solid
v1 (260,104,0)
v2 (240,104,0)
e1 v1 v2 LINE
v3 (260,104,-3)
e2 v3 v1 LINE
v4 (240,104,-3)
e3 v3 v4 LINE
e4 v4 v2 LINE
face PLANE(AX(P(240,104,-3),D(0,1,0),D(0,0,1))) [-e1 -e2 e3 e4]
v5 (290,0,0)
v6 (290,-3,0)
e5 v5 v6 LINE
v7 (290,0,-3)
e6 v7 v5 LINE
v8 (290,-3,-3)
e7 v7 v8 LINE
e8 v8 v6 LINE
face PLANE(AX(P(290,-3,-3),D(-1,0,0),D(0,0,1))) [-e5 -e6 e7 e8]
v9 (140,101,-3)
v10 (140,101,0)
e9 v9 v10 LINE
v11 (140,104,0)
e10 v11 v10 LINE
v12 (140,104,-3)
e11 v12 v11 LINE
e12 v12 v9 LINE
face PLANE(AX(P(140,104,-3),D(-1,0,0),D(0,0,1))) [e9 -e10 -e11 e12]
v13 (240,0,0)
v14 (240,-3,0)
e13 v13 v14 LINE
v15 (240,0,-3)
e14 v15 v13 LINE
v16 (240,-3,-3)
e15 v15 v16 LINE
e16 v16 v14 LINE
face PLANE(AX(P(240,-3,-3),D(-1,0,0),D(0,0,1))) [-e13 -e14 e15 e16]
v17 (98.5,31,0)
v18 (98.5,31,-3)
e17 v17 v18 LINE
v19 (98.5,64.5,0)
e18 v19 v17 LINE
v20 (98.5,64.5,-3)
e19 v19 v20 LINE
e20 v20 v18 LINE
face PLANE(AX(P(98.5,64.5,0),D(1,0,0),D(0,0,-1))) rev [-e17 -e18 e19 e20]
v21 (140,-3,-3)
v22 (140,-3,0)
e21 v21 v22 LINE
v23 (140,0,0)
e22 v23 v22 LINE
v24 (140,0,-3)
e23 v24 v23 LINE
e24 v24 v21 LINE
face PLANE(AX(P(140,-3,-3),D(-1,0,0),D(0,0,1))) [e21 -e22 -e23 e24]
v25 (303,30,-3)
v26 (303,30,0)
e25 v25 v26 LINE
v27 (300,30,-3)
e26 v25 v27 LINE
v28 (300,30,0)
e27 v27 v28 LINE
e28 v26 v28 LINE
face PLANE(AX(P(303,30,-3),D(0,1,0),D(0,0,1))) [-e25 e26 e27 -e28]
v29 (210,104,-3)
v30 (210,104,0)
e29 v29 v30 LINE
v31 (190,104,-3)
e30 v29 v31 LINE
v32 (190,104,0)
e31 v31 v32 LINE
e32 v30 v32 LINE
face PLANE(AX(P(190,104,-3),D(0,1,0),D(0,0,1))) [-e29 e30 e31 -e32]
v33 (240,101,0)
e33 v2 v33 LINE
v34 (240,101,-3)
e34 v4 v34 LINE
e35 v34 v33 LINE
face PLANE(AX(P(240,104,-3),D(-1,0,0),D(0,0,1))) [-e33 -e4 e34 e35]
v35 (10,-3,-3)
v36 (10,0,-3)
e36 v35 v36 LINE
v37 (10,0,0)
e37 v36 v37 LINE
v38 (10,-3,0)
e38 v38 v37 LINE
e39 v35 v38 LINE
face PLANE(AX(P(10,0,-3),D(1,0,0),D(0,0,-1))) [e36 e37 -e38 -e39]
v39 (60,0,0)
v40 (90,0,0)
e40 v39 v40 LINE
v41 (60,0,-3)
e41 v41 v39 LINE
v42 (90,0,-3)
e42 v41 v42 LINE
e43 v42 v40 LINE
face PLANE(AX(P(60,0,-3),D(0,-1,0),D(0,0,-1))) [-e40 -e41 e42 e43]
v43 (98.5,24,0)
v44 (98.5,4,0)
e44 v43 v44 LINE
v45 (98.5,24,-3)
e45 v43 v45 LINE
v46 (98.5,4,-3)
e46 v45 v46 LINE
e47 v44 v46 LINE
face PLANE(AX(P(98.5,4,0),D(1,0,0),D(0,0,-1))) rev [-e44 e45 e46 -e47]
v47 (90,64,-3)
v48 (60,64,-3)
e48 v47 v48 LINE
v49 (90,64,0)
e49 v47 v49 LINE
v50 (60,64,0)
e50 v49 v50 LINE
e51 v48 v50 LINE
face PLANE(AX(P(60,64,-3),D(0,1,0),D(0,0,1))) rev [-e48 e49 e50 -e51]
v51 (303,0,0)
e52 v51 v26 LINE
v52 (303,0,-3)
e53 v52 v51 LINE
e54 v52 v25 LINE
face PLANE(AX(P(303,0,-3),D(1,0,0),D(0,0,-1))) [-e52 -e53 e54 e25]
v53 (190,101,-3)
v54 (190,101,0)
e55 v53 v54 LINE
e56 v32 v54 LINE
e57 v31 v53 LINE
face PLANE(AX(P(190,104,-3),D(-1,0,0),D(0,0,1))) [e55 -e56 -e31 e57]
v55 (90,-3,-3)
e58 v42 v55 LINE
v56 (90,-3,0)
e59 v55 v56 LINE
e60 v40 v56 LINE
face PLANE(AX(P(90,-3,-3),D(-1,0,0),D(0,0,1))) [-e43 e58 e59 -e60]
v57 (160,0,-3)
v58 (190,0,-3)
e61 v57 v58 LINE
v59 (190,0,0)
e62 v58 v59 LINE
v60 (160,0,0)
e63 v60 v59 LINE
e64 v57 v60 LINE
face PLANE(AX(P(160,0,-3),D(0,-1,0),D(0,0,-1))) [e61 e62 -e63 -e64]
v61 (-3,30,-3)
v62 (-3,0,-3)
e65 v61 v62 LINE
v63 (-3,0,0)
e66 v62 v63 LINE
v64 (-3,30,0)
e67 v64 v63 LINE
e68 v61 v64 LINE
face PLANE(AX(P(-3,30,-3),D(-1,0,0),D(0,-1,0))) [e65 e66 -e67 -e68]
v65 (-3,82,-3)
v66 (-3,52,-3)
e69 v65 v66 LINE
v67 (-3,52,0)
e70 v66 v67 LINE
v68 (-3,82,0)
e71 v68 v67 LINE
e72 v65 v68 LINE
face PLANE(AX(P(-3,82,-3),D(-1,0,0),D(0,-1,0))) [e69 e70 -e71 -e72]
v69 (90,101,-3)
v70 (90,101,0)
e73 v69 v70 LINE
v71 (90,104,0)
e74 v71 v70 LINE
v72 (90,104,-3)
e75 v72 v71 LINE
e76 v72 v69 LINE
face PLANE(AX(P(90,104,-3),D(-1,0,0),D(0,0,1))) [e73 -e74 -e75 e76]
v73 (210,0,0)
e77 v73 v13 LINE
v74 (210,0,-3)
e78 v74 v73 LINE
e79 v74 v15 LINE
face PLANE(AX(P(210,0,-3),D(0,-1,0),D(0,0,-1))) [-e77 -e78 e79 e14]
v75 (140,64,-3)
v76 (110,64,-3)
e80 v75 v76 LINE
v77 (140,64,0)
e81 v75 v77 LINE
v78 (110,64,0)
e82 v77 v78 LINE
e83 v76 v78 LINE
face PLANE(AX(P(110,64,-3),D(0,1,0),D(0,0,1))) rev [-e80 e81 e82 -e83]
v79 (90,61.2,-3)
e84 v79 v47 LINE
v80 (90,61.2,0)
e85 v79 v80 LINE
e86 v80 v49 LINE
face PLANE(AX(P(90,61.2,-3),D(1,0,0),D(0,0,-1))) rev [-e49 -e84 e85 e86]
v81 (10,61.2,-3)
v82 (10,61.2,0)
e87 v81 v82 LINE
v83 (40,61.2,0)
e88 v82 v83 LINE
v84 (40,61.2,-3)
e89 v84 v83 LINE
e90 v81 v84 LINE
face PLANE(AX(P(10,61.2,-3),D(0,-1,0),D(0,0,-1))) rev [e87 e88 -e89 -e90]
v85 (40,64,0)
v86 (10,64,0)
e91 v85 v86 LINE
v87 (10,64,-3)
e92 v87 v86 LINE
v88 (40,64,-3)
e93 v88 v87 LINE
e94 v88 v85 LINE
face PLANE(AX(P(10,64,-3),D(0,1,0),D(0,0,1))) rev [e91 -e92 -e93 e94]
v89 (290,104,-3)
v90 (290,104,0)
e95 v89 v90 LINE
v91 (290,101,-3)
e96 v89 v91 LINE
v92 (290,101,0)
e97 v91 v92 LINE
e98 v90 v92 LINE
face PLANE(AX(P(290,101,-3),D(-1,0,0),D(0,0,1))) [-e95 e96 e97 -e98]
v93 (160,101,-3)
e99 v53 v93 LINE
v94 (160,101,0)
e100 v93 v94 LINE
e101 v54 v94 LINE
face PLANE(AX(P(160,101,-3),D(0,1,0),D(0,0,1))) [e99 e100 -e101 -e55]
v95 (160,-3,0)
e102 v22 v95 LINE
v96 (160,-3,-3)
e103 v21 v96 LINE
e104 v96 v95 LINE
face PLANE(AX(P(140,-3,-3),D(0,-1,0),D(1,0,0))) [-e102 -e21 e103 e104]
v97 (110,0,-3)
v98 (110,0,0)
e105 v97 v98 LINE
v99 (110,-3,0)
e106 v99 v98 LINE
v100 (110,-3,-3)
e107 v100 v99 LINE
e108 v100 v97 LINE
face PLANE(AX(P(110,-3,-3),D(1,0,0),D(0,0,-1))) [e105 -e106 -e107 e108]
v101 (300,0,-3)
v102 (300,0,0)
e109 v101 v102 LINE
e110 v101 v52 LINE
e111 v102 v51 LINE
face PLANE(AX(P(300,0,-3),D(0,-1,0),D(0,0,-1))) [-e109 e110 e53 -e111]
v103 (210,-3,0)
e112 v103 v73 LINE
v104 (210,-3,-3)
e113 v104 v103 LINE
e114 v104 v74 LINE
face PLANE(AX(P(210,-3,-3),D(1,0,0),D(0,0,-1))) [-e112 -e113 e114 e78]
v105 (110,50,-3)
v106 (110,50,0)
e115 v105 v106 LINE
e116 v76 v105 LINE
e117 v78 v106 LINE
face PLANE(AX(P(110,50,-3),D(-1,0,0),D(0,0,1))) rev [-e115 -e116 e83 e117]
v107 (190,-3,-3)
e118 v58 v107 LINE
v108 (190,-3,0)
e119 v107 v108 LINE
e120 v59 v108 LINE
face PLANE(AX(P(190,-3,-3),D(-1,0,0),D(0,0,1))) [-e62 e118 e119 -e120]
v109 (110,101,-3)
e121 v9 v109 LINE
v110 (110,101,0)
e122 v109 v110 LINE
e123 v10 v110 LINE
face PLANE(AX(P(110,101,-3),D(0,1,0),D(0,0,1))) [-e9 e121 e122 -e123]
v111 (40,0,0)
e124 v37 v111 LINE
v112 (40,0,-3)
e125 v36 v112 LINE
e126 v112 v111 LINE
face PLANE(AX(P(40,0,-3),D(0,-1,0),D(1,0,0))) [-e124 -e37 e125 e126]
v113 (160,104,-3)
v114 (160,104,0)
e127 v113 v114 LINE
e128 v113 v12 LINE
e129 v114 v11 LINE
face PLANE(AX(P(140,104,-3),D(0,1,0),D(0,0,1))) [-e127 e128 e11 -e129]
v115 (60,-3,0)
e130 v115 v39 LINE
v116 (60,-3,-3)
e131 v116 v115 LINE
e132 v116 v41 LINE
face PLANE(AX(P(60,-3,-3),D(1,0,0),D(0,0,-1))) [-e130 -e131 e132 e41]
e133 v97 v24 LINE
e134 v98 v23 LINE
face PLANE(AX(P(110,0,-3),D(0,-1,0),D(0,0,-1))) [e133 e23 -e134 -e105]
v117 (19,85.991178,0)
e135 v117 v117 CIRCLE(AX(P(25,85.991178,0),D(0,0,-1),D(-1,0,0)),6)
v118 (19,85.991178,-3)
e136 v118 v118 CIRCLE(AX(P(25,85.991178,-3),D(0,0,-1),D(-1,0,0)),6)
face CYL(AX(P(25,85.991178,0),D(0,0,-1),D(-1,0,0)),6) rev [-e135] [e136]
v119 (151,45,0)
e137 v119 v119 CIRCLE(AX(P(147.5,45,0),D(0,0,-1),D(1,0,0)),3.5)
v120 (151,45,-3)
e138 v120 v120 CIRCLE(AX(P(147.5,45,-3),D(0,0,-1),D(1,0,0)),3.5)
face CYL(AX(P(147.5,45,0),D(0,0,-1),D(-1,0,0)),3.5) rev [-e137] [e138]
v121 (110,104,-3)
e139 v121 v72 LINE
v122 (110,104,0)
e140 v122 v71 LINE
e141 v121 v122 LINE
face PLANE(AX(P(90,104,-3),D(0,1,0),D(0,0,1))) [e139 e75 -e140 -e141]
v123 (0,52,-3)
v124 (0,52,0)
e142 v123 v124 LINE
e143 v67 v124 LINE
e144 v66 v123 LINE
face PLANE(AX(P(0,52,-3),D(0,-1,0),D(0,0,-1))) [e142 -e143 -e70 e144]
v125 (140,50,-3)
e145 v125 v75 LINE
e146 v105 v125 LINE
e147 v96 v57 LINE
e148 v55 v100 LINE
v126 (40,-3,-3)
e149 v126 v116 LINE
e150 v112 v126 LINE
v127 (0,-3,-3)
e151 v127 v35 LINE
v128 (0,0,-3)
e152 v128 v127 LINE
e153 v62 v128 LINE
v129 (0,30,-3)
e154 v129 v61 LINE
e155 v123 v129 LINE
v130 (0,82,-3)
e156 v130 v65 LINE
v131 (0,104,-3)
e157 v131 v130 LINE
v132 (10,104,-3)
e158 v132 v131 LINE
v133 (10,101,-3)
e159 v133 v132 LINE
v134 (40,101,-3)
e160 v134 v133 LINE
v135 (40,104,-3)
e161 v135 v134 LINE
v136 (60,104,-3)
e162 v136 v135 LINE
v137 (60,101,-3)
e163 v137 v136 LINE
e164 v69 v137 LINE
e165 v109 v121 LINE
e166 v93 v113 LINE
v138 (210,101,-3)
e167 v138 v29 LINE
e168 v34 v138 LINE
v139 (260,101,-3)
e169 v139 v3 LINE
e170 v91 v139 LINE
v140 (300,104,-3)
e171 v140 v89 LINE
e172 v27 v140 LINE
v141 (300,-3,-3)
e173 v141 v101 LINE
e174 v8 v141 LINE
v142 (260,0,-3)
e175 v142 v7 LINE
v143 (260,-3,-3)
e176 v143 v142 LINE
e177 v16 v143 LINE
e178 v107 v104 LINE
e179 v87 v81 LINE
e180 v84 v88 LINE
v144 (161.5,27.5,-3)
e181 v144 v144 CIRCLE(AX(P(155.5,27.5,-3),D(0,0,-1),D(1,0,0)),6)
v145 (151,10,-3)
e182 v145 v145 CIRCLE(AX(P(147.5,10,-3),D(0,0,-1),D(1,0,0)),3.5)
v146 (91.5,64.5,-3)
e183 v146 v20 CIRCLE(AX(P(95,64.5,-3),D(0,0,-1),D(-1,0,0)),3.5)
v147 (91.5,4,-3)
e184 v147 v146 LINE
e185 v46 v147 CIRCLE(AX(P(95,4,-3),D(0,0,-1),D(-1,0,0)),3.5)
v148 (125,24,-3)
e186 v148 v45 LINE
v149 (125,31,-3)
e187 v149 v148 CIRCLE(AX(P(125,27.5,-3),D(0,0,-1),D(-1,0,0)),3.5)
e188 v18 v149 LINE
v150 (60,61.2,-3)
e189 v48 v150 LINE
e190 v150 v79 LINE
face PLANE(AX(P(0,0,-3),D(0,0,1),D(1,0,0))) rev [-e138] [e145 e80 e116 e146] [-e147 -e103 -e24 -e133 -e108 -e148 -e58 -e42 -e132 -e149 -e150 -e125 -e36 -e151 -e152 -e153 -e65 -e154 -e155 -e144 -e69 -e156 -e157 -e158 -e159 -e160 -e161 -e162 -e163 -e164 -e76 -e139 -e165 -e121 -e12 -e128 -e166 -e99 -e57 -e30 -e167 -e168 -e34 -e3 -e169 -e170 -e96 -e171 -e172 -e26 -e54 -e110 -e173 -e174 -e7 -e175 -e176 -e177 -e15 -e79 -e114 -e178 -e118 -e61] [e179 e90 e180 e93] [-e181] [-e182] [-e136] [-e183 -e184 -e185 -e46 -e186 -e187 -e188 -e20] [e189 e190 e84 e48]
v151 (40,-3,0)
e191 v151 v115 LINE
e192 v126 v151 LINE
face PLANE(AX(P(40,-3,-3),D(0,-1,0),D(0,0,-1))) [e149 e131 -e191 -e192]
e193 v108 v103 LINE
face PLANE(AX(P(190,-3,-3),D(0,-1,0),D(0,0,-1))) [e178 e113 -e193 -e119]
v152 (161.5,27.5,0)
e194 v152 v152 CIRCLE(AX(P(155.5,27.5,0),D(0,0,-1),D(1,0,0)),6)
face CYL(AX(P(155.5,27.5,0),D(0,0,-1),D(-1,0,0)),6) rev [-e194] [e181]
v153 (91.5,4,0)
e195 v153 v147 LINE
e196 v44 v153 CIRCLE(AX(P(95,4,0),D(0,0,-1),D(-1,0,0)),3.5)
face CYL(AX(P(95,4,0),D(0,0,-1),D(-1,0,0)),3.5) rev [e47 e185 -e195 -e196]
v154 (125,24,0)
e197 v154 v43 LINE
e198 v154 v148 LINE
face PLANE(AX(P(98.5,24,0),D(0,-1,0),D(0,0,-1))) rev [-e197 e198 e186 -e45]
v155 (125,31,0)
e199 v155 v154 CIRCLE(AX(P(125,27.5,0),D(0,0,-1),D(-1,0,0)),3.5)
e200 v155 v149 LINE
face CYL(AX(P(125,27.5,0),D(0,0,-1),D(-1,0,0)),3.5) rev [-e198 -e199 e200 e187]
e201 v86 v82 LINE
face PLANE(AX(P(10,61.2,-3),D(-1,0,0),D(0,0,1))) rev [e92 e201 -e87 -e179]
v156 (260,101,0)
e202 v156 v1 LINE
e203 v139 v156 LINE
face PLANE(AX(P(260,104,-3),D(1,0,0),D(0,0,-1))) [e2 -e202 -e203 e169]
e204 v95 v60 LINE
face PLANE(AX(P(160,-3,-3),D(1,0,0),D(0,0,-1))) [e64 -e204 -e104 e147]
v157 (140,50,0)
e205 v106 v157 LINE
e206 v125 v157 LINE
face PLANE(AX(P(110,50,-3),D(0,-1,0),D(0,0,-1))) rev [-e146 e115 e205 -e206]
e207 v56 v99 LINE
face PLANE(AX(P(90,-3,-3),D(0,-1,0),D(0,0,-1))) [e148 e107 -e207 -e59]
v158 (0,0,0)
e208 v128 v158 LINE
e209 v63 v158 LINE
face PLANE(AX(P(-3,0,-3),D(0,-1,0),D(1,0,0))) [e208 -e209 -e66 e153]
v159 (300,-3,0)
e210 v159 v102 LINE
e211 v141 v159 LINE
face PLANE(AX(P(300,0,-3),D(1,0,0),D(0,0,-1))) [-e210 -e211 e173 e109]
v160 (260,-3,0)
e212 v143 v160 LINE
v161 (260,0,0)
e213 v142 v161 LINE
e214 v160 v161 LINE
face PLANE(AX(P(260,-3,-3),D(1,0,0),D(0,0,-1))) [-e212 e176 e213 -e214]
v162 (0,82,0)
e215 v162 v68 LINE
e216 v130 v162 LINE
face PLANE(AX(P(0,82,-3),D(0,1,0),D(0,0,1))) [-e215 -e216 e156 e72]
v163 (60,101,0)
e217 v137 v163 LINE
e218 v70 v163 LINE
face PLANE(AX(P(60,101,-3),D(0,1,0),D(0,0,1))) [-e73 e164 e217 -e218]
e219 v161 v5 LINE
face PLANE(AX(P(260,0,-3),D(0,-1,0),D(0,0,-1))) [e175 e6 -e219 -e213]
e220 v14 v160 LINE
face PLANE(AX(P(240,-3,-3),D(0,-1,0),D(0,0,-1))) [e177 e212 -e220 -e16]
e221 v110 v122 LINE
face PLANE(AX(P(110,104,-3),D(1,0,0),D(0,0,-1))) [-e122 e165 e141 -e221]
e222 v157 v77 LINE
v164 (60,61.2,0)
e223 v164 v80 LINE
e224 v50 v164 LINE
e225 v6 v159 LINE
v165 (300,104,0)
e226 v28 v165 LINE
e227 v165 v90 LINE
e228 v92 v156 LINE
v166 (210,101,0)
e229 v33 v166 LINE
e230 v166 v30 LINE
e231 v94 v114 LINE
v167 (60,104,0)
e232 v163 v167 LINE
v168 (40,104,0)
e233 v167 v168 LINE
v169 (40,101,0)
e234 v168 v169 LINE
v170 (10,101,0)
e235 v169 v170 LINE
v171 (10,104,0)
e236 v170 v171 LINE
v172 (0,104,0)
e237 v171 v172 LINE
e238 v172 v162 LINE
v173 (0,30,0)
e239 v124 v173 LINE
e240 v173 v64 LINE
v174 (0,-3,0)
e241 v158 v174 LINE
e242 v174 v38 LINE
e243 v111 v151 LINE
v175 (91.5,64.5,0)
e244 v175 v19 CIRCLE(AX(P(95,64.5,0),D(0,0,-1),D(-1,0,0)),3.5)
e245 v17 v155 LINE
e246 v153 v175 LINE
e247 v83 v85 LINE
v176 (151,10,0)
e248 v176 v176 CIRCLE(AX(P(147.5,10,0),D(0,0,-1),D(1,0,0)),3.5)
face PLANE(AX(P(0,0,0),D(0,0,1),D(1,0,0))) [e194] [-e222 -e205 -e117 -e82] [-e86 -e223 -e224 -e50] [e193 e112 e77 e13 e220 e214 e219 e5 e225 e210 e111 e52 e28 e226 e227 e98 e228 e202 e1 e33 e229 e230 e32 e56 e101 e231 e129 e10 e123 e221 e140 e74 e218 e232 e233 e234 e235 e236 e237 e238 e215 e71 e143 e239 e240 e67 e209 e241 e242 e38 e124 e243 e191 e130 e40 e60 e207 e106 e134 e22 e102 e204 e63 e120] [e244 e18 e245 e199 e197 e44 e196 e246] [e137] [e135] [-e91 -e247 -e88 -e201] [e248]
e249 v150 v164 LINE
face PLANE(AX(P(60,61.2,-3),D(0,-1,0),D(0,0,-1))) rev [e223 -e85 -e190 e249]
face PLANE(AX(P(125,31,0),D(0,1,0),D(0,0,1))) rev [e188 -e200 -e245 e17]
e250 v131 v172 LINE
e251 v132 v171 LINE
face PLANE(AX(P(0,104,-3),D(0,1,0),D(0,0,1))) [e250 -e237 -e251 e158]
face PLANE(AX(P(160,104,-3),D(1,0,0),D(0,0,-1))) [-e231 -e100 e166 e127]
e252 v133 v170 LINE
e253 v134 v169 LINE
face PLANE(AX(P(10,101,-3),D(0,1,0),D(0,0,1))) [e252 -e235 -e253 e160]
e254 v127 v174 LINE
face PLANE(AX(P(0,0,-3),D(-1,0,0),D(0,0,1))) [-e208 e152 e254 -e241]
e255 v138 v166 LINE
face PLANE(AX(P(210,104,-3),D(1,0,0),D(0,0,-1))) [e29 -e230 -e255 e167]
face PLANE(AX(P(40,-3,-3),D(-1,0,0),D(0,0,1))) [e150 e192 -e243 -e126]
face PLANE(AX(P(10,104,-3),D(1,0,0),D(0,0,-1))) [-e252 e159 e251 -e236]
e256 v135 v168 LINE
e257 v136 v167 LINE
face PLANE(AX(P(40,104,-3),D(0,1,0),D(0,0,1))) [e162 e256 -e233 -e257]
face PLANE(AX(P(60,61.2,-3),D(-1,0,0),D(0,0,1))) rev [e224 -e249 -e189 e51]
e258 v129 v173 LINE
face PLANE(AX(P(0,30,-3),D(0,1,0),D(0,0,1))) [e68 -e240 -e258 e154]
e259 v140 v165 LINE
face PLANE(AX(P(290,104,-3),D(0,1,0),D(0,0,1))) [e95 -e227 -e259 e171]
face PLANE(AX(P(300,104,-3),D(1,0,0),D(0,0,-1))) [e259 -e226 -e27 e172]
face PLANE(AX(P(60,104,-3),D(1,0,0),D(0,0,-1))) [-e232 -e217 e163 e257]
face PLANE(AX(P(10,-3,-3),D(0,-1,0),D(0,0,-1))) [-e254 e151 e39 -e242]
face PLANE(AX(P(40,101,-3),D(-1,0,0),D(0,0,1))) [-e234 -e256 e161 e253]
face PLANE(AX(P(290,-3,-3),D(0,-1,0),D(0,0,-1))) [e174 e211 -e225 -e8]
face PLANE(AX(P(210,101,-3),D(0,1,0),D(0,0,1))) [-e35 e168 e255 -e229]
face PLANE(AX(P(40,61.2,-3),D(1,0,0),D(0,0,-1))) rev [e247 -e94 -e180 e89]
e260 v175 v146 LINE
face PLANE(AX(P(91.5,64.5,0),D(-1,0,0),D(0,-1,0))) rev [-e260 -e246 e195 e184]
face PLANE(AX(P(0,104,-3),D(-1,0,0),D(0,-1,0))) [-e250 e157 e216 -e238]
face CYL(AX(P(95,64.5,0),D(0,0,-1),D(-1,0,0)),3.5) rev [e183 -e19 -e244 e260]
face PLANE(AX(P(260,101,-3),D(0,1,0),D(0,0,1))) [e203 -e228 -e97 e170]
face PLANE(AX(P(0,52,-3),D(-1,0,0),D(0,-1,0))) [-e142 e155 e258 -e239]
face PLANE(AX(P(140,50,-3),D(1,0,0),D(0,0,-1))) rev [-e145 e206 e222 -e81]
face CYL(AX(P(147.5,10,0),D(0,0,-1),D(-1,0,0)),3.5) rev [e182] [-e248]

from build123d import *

# Parameters (mm, degrees)
IMPORTED_START                = -3
IMPORTED_BODY_4_1_OUTLINE_W   = 30
IMPORTED_BODY_4_1_OUTLINE_H   = 2.8
IMPORTED_BODY_4_1_OUTLINE_H_2 = 14
IMPORTED_BODY_4_1_DEPTH       = 3
SKETCH_1_R                    = 3.5
SKETCH_1_R_2                  = 6
CUT_EXTRUDE_1_DEPTH           = 3


# Read off the part's stored shape, not the designer's step: 基体零件-零件4-1
with BuildPart() as part:
    # 基体零件-零件4-1 outline → 基体零件-零件4-1 (new body)
    with BuildSketch(Plane.XY.offset(IMPORTED_START)):
        Polygon((0, 0), (0, -3), (10, -3), (10, 0), (40, 0), (40, -3), (60, -3), (60, 0), (90, 0), (90, -3), (110, -3), (110, 0), (140, 0), (140, -3), (160, -3), (160, 0), (190, 0), (190, -3), (210, -3), (210, 0), (240, 0), (240, -3), (260, -3), (260, 0), (290, 0), (290, -3), (300.000000004, -3), (300.000000004, 0), (303.000000004, 0), (303.000000004, 30), (300.000000004, 30), (300.000000004, 104), (290, 104), (290, 100.999999998), (260, 100.999999998), (260, 103.999999998), (240, 103.999999998), (240, 100.999999998), (210, 100.999999998), (210, 103.999999998), (190, 103.999999998), (190, 100.999999998), (160, 100.999999998), (160, 103.999999998), (140, 103.999999998), (140, 100.999999998), (110, 100.999999998), (110, 103.999999998), (90, 103.999999998), (90, 100.999999998), (60, 100.999999998), (60, 103.999999998), (40, 103.999999998), (40, 100.999999998), (10, 100.999999998), (10, 103.999999998), (0, 103.999999998), (0, 81.999999998), (-3, 81.999999998), (-3, 51.999999998), (0, 51.999999998), (0, 30), (-3, 30), (-3, 0), align=None)
        with Locations((25, 62.6)):
            Rectangle(IMPORTED_BODY_4_1_OUTLINE_W, IMPORTED_BODY_4_1_OUTLINE_H, mode=Mode.SUBTRACT)
        with Locations((75, 62.6)):
            Rectangle(IMPORTED_BODY_4_1_OUTLINE_W, IMPORTED_BODY_4_1_OUTLINE_H, mode=Mode.SUBTRACT)
        with Locations((125, 57)):
            Rectangle(IMPORTED_BODY_4_1_OUTLINE_W, IMPORTED_BODY_4_1_OUTLINE_H_2, mode=Mode.SUBTRACT)
    extrude(amount=IMPORTED_BODY_4_1_DEPTH)

    # 草图1 → 切除-拉伸1 (cut)
    with BuildSketch(Plane(origin=(0, 0, -3), x_dir=(-1, 0, 0), z_dir=(0, 0, -1))):
        with Locations(Location((-147.5, 10, 0), (0, 0, 180))):
            Circle(SKETCH_1_R)
        with Locations(Location((-147.5, 45, 0), (0, 0, 180))):
            Circle(SKETCH_1_R)
        with Locations(Location((-155.5, 27.5, 0), (0, 0, 180))):
            Circle(SKETCH_1_R_2)
        with Locations((-25, 85.991178075)):
            Circle(SKETCH_1_R_2)
        with BuildLine():
            Line((-125, 31), (-98.5, 31))
            Line((-98.5, 31), (-98.5, 64.5))
            ThreePointArc((-98.5, 64.5), (-95, 68), (-91.5, 64.5))
            Line((-91.5, 64.5), (-91.5, 4))
            ThreePointArc((-91.5, 4), (-95, 0.5), (-98.5, 4))
            Line((-98.5, 4), (-98.5, 24))
            Line((-98.5, 24), (-125, 24))
            ThreePointArc((-125, 24), (-128.5, 27.5), (-125, 31))
        make_face()
    extrude(amount=-CUT_EXTRUDE_1_DEPTH, mode=Mode.SUBTRACT)


solid = part.part
